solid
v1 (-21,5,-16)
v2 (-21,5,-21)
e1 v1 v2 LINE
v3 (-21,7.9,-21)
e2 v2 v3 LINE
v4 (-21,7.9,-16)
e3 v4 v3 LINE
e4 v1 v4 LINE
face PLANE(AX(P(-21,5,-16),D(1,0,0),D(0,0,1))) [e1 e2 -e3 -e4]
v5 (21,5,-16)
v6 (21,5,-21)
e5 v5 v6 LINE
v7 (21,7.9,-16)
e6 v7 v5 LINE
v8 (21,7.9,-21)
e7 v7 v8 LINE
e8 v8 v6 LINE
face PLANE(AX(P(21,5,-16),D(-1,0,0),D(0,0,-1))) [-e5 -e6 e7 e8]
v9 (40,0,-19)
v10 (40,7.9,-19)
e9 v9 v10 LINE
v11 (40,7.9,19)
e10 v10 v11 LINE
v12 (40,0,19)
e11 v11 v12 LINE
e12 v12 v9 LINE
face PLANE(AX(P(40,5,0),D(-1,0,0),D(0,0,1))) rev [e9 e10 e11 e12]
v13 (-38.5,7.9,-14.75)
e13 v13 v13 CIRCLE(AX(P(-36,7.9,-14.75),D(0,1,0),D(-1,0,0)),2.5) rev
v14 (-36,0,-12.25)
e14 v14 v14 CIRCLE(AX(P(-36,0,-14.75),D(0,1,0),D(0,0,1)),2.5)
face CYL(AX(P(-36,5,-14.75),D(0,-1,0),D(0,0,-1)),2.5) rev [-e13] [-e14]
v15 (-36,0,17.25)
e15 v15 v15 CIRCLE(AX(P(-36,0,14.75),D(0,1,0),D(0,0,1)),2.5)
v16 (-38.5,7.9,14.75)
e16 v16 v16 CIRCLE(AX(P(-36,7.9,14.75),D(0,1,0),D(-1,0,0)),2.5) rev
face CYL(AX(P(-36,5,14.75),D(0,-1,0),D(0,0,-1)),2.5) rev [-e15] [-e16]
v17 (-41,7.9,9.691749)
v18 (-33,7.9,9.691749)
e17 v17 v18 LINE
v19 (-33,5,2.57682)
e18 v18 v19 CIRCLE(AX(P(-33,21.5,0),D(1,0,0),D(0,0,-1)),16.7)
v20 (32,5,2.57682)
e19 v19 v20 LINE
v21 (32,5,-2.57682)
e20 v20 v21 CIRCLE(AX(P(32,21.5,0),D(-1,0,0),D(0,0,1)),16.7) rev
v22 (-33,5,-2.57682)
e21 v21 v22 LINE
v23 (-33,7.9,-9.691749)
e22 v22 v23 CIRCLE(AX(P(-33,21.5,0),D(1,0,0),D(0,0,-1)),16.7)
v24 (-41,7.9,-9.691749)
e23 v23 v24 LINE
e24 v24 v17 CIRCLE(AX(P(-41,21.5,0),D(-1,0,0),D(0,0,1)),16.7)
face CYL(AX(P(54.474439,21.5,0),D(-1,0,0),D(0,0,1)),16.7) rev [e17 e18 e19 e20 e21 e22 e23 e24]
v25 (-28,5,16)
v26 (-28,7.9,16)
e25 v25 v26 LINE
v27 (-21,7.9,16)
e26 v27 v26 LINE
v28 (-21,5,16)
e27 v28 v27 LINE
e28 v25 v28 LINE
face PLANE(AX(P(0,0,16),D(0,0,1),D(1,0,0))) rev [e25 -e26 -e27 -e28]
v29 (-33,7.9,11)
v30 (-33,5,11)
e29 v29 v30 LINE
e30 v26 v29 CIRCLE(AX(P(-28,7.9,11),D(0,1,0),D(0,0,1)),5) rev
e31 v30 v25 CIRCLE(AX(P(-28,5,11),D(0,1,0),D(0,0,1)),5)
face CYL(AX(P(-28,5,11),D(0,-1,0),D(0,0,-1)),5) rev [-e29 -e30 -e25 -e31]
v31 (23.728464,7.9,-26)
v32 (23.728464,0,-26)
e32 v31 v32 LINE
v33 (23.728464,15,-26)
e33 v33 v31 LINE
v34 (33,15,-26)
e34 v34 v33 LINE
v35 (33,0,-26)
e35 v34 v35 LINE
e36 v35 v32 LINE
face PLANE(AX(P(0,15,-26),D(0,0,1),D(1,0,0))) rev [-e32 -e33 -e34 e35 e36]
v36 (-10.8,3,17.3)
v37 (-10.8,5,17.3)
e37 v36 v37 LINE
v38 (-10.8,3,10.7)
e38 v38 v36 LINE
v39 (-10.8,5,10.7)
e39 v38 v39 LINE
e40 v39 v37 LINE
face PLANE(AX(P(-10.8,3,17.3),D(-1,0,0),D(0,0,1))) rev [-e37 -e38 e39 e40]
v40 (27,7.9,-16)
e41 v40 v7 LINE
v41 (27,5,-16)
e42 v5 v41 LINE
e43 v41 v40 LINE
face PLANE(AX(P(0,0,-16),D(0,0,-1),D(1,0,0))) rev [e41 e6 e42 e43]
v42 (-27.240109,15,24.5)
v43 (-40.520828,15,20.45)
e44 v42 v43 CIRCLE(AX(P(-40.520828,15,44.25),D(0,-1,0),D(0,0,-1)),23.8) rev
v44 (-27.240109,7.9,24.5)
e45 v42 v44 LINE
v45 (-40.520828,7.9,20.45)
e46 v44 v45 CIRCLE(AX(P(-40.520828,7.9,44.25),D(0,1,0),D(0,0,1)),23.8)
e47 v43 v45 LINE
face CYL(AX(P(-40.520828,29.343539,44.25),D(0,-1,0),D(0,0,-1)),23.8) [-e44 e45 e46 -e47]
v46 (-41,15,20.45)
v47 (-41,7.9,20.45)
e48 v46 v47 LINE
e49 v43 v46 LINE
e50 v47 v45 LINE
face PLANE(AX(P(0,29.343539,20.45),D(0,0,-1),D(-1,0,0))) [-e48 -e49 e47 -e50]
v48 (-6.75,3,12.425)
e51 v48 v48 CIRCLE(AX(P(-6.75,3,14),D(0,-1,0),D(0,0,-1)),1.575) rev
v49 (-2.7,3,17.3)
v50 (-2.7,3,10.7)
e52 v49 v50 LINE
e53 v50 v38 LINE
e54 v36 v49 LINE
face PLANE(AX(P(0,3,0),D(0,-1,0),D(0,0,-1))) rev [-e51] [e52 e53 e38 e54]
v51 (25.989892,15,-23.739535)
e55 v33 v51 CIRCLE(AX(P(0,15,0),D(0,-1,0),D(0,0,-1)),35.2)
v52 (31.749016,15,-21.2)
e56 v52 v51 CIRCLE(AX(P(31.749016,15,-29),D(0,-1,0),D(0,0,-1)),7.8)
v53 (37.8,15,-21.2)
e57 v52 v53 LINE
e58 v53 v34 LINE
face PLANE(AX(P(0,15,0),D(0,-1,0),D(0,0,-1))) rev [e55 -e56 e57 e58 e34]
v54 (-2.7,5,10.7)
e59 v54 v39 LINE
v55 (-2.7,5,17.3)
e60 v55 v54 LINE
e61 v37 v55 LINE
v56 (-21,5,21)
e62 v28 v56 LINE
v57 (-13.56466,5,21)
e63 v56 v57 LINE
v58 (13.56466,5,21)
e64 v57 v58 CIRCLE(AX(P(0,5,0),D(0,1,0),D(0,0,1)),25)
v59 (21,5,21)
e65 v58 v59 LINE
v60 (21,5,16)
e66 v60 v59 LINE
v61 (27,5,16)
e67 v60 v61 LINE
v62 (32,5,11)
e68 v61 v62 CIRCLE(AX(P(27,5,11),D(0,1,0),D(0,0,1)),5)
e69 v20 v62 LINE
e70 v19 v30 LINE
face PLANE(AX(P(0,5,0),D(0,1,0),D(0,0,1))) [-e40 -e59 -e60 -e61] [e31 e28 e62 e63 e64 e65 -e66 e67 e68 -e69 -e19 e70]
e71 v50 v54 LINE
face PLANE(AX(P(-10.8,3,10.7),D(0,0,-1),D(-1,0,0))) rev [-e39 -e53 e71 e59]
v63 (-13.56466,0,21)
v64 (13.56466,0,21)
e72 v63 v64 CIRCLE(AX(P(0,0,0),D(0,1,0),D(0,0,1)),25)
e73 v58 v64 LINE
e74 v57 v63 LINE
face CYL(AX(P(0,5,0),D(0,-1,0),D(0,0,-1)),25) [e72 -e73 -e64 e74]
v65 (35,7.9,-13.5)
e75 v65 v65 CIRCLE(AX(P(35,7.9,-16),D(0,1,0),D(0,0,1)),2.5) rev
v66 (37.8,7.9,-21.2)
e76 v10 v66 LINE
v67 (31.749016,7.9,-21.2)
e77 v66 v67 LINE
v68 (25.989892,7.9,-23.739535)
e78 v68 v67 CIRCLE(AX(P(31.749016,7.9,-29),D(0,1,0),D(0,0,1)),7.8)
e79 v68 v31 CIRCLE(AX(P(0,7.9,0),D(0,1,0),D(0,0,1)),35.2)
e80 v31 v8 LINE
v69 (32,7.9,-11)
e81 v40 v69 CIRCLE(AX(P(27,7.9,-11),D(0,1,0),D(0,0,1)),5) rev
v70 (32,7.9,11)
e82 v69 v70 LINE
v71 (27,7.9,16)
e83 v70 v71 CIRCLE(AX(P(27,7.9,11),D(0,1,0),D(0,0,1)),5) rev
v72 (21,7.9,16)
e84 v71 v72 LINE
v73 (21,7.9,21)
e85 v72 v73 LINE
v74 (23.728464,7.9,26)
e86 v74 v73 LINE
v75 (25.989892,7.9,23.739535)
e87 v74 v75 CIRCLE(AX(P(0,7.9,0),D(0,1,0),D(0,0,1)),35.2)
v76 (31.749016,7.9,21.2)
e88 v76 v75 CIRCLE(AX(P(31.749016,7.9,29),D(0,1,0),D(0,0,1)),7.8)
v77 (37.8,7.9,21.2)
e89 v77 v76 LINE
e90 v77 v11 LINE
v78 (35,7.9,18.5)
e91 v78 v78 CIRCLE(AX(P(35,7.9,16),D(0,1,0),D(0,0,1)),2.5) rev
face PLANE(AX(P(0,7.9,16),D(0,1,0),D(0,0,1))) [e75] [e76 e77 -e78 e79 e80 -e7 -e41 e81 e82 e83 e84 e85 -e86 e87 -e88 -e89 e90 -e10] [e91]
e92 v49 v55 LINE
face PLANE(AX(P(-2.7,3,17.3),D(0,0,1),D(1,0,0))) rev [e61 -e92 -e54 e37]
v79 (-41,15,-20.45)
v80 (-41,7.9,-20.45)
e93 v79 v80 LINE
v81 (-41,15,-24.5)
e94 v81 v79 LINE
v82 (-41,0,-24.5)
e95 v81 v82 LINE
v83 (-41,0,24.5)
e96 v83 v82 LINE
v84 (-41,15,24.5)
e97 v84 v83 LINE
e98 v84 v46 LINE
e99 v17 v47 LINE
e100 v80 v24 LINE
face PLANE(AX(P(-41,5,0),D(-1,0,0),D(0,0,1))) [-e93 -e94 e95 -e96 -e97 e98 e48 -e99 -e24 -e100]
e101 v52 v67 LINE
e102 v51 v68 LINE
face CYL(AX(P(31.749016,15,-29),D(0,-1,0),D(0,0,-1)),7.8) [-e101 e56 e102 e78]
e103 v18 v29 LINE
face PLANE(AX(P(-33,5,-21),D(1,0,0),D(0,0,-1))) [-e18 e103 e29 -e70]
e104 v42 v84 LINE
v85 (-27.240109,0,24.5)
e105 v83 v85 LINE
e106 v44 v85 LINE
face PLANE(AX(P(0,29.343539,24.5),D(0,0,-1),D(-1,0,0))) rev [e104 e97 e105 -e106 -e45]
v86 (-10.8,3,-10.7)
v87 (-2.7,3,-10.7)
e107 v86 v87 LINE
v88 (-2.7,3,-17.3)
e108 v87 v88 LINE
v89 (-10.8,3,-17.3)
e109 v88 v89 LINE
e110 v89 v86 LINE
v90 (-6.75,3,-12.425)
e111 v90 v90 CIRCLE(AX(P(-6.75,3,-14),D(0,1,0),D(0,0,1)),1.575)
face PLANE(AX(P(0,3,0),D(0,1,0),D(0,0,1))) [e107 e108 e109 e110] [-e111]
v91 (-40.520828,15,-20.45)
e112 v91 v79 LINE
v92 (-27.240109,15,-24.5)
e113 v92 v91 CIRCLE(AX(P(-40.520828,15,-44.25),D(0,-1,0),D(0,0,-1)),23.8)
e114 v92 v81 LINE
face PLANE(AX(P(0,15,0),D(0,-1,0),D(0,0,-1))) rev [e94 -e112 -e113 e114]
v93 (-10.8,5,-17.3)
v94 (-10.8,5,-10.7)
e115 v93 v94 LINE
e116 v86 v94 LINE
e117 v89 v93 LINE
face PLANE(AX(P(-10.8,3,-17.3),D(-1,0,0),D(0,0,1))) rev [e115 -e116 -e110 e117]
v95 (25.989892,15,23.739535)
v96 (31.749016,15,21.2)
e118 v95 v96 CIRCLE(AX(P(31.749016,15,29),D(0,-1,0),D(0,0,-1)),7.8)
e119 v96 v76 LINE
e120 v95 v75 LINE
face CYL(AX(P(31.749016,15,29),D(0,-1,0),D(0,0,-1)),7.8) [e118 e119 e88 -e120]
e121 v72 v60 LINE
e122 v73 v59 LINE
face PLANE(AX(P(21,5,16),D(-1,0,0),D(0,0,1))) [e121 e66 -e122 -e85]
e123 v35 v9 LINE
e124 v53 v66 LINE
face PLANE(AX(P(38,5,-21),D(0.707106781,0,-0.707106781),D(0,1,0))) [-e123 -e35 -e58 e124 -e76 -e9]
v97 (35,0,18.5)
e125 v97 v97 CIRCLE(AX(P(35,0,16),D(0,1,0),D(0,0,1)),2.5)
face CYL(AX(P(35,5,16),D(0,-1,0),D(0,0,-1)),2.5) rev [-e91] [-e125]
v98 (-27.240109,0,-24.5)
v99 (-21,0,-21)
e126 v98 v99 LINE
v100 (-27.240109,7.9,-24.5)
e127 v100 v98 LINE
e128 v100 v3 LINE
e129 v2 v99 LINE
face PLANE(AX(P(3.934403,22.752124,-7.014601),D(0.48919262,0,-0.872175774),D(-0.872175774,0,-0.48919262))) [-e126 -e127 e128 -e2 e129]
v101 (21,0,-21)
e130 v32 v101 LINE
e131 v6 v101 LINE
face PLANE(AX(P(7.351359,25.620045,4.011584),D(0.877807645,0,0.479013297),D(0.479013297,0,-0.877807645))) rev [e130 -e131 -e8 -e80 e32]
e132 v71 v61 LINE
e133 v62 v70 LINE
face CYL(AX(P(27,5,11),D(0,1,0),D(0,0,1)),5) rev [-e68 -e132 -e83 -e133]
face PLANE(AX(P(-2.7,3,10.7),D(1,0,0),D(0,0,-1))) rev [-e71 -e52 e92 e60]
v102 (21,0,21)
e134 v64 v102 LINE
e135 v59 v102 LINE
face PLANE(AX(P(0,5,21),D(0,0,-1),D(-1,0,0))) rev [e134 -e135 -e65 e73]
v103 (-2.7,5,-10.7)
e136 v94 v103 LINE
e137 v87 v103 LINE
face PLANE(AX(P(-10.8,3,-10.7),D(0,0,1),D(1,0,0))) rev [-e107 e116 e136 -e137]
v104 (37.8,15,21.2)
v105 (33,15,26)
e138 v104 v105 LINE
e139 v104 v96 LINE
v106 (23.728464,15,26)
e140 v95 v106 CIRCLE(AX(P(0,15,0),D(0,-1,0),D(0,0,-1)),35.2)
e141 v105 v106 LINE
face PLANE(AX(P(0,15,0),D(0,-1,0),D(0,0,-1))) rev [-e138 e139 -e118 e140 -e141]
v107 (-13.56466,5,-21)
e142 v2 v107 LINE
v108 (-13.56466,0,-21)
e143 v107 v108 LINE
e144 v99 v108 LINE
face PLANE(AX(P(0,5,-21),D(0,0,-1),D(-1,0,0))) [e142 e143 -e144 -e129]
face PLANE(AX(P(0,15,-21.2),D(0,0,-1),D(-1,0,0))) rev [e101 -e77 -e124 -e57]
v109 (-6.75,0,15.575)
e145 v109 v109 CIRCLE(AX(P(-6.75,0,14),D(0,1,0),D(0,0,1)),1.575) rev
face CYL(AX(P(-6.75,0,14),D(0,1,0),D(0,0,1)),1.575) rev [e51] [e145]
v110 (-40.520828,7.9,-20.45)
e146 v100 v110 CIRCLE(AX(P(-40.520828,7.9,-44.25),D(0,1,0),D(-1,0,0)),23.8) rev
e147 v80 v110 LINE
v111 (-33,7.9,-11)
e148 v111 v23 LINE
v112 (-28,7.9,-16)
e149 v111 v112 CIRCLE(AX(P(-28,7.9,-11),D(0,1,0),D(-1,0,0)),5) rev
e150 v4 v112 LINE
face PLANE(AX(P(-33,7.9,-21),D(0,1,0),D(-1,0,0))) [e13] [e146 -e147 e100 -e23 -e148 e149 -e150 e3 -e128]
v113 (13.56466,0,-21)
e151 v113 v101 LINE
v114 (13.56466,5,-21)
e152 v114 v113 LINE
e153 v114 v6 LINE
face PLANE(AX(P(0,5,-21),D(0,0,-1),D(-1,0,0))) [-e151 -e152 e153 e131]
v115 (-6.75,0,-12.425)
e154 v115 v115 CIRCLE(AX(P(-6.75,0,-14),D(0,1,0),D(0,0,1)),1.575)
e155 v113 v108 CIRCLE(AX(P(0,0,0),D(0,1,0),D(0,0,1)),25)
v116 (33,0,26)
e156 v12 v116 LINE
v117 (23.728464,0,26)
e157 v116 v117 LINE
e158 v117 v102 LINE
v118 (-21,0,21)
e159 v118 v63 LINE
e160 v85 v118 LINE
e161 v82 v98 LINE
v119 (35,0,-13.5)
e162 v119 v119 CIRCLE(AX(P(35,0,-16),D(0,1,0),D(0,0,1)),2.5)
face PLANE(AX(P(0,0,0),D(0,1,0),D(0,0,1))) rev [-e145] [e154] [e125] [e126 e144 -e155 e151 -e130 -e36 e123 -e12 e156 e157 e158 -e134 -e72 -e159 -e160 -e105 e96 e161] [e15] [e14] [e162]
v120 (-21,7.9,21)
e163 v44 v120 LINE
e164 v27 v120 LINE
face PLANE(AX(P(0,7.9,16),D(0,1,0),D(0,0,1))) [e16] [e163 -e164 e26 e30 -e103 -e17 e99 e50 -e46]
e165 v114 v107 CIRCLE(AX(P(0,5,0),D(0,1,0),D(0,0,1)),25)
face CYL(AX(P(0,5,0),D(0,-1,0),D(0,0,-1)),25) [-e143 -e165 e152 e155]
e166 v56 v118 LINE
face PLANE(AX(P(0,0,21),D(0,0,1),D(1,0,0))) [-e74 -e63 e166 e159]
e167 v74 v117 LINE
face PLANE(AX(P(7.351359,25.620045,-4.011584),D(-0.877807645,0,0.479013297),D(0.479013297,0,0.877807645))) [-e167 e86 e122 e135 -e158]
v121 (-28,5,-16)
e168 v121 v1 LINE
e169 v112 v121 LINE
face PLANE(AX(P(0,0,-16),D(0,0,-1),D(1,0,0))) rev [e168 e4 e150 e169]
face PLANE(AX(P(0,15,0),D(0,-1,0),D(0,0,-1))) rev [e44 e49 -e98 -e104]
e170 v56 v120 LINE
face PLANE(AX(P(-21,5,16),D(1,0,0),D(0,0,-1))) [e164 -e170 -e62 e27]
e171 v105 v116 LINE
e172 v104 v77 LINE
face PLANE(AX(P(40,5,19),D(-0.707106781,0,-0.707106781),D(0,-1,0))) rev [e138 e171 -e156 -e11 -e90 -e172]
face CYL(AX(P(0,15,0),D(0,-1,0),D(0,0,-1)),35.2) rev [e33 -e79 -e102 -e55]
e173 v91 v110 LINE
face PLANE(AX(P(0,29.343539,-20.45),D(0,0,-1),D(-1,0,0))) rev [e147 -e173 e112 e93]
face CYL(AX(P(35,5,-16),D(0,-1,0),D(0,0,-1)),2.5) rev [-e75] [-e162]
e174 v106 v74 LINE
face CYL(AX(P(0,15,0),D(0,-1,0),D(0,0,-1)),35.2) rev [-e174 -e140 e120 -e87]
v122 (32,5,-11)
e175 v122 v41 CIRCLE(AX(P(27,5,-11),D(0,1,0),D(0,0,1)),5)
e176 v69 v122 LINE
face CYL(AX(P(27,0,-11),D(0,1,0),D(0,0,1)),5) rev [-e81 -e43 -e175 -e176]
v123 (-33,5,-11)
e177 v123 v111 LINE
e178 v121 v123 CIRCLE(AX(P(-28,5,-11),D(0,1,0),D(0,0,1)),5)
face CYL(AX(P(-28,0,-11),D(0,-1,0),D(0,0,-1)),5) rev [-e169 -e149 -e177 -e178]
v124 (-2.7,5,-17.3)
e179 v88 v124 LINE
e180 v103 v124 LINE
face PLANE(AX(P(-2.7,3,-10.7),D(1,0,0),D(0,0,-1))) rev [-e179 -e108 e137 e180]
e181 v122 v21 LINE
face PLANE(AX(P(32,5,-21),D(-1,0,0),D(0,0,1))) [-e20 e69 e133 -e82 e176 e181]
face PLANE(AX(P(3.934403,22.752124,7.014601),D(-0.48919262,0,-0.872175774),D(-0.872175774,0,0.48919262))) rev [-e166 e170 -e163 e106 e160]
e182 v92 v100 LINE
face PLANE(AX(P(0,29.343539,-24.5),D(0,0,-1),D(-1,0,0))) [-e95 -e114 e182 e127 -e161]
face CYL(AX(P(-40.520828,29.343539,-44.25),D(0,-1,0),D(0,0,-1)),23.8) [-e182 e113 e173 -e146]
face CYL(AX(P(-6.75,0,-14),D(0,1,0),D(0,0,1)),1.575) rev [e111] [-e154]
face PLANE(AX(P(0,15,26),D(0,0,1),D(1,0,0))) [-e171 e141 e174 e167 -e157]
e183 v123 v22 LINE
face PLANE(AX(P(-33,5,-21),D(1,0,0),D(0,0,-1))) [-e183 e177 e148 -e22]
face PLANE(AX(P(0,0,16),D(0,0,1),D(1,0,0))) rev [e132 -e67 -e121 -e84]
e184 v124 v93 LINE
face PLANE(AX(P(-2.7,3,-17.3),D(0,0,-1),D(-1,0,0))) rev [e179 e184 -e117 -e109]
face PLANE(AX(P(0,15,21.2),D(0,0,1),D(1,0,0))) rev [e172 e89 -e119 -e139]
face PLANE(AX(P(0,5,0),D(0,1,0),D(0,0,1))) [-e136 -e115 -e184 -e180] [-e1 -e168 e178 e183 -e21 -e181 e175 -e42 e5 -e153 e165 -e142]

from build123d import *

# Parameters (mm, degrees)
SKETCH_1_R          = 25
SKETCH_1_W          = 81
SKETCH_1_H          = 42
SKETCH_1_R_2        = 2.5
EXTRUDE_1_DEPTH     = 5
SKETCH_3_W          = 8.1
SKETCH_3_H          = 6.6
SKETCH_3_R          = 1.575
CUT_EXTRUDE_1_DEPTH = 2
SKETCH_3_2_R        = 1.575
CUT_EXTRUDE_2_DEPTH = 49.280430818
SKETCH_4_W          = 8
SKETCH_4_H          = 2.9
EXTRUDE_2_DEPTH     = 42
SKETCH_1_3_R        = 2.5
CUT_EXTRUDE_3_DEPTH = 42
EXTRUDE_START       = 21
SKETCH_5_W          = 11
SKETCH_5_H          = 2.9
EXTRUDE_3_DEPTH     = 5
SKETCH_5_W_2        = 12
EXTRUDE_3_2_DEPTH   = 5
CUT_EXTRUDE_4_REACH = 87.138
CHAMFER_1_SIZE      = 2
EXTRUDE_4_DEPTH     = 15
EXTRUDE_4_2_DEPTH   = 15
EXTRUDE_START_2     = -15
EXTRUDE_5_DEPTH     = 7.9
EXTRUDE_6_DEPTH     = 15
EXTRUDE_7_DEPTH     = 7.9
FILLET_1_R          = 5


# Read off the part's stored shape, not the designer's step: 凸台-拉伸7
with BuildPart() as part:
    # 草图1 → 凸台-拉伸1 (new body)
    # profile 1 of 2: a face of its own
    with BuildSketch(Plane(origin=(0, 0, 0), x_dir=(1, 0, 0), z_dir=(0, 1, 0))):
        Circle(SKETCH_1_R)
    # profile 2 of 2: a face of its own
    with BuildSketch(Plane(origin=(0, 0, 0), x_dir=(1, 0, 0), z_dir=(0, 1, 0))):
        with Locations((-0.5, 0)):
            Rectangle(SKETCH_1_W, SKETCH_1_H)
        with Locations(Location((35, 16, 0), (0, 0, 270))):
            Circle(SKETCH_1_R_2, mode=Mode.SUBTRACT)
        with Locations(Location((35, -16, 0), (0, 0, 270))):
            Circle(SKETCH_1_R_2, mode=Mode.SUBTRACT)
        with Locations(Location((-36, 14.75, 0), (0, 0, 270))):
            Circle(SKETCH_1_R_2, mode=Mode.SUBTRACT)
        with Locations(Location((-36, -14.75, 0), (0, 0, 270))):
            Circle(SKETCH_1_R_2, mode=Mode.SUBTRACT)
    extrude(amount=EXTRUDE_1_DEPTH)

    # 草图3 → 切除-拉伸1 (cut)
    # profile 1 of 2: a face of its own
    with BuildSketch(Plane(origin=(0, 5, 0), x_dir=(1, 0, 0), z_dir=(0, 1, 0))):
        with Locations((-6.75, -14)):
            Rectangle(SKETCH_3_W, SKETCH_3_H)
        with Locations(Location((-6.75, -14, 0), (0, 0, 90))):
            Circle(SKETCH_3_R, mode=Mode.SUBTRACT)
    # profile 2 of 2: a face of its own
    with BuildSketch(Plane(origin=(0, 5, 0), x_dir=(1, 0, 0), z_dir=(0, 1, 0))):
        with Locations((-6.75, 14)):
            Rectangle(SKETCH_3_W, SKETCH_3_H)
        with Locations(Location((-6.75, 14, 0), (0, 0, 270))):
            Circle(SKETCH_3_R, mode=Mode.SUBTRACT)
    extrude(amount=-CUT_EXTRUDE_1_DEPTH, mode=Mode.SUBTRACT)

    # 草图3<2> → 切除-拉伸2 (cut, through all)
    with BuildSketch(Plane(origin=(0, 5, 0), x_dir=(1, 0, 0), z_dir=(0, 1, 0))):
        with Locations(Location((-6.75, 14, 0), (0, 0, 270))):
            Circle(SKETCH_3_2_R)
        with Locations(Location((-6.75, -14, 0), (0, 0, 270))):
            Circle(SKETCH_3_2_R)
    extrude(amount=-CUT_EXTRUDE_2_DEPTH, mode=Mode.SUBTRACT)

    # 草图4 → 凸台-拉伸2 (add)
    with BuildSketch(Plane.XY.offset(21)):
        with Locations((36, 6.45)):
            Rectangle(SKETCH_4_W, SKETCH_4_H)
        with Locations((-37, 6.45)):
            Rectangle(SKETCH_4_W, SKETCH_4_H)
    extrude(amount=-EXTRUDE_2_DEPTH)

    # 草图1<3> → 切除-拉伸3 (cut)
    with BuildSketch(Plane(origin=(0, 0, 0), x_dir=(1, 0, 0), z_dir=(0, 1, 0))):
        with Locations(Location((35, 16, 0), (0, 0, 270))):
            Circle(SKETCH_1_3_R)
        with Locations(Location((35, -16, 0), (0, 0, 270))):
            Circle(SKETCH_1_3_R)
        with Locations(Location((-36, 14.75, 0), (0, 0, 180))):
            Circle(SKETCH_1_3_R)
        with Locations(Location((-36, -14.75, 0), (0, 0, 180))):
            Circle(SKETCH_1_3_R)
    extrude(amount=CUT_EXTRUDE_3_DEPTH, mode=Mode.SUBTRACT)


with BuildPart() as body_2:
    # 草图5 → 凸台-拉伸3 (new body)
    with BuildSketch(Plane.XY.offset(EXTRUDE_START)):
        with Locations((26.5, 6.45)):
            Rectangle(SKETCH_5_W, SKETCH_5_H)
    extrude_3 = extrude(amount=-EXTRUDE_3_DEPTH)


with BuildPart() as body_3:
    # 草图5 → Extrude 3 2 (new body)
    with BuildSketch(Plane.XY.offset(EXTRUDE_START)):
        with Locations((-27, 6.45)):
            Rectangle(SKETCH_5_W_2, SKETCH_5_H)
    extrude_3_2 = extrude(amount=-EXTRUDE_3_2_DEPTH)



with BuildPart() as part_1:
    add(part.part)

    # 镜向2: 凸台-拉伸3, Extrude 3 2 across plane
    add(extrude_3.mirror(Plane(origin=(0, 0, 0), x_dir=(1, 0, 0), z_dir=(0, 0, -1))))
    add(extrude_3_2.mirror(Plane(origin=(0, 0, 0), x_dir=(1, 0, 0), z_dir=(0, 0, -1))))

    # 切除-拉伸4: up to this face of the body (flat: up to its plane)
    cut_extrude_4_end = Plane(part_1.part.faces().sort_by_distance((32, 6.45, 2.5))[0])
    # 草图6 → 切除-拉伸4 (cut, up to the picked face)
    with BuildSketch(Plane.ZY.offset(41), mode=Mode.PRIVATE) as cut_extrude_4_sk1:
        with BuildLine():
            Line((11.041960784, 8.971428571), (-11.041960784, 8.971428571))
            ThreePointArc((-11.041960784, 8.971428571), (-8.690257734, 7.239234925), (-6.072727273, 5.943265655))
            ThreePointArc((-6.072727273, 5.943265655), (0, 4.8), (6.072727273, 5.943265655))
            ThreePointArc((6.072727273, 5.943265655), (8.690257734, 7.239234925), (11.041960784, 8.971428571))
        make_face()
    cut_extrude_4_tool1 = split(extrude(cut_extrude_4_sk1.sketch, amount=-CUT_EXTRUDE_4_REACH, mode=Mode.PRIVATE), bisect_by=cut_extrude_4_end, keep=Keep.BOTH, mode=Mode.PRIVATE)
    add(cut_extrude_4_tool1.solids().sort_by(Axis((-41, 7.283597, 0), (1, 0, 0)))[0], mode=Mode.SUBTRACT)

    # 倒角1
    chamfer_1_edges = [part_1.edges().sort_by_distance(p)[0] for p in [
        (-41, 3.95, 21),
        (-41, 3.95, -21),
        (40, 3.95, -21),
        (40, 3.95, 21),
    ]]
    chamfer(chamfer_1_edges, length=CHAMFER_1_SIZE)



with BuildPart() as body_4:
    # 草图9 → 凸台-拉伸4 (new body)
    with BuildSketch(Plane.XZ):
        with BuildLine():
            Line((33, 26), (23.72846392, 26))
            ThreePointArc((23.72846392, 26), (24.88485791, 24.895458357), (25.989891949, 23.739534884))
            ThreePointArc((25.989891949, 23.739534884), (27.687521221, 22.340851231), (29.708138181, 21.471732017))
            ThreePointArc((29.708138181, 21.471732017), (30.719571772, 21.268231436), (31.749015733, 21.2))
            Line((31.749015733, 21.2), (37.8, 21.2))
            Line((37.8, 21.2), (33, 26))
        make_face()
    extrude(amount=-EXTRUDE_4_DEPTH)


with BuildPart() as body_5:
    # 草图9 → Extrude 4 2 (new body)
    with BuildSketch(Plane.XZ):
        with BuildLine():
            Line((33, -26), (37.8, -21.2))
            Line((37.8, -21.2), (31.749015733, -21.2))
            ThreePointArc((31.749015733, -21.2), (30.719571772, -21.268231436), (29.708138181, -21.471732017))
            ThreePointArc((29.708138181, -21.471732017), (27.687521221, -22.340851231), (25.989891949, -23.739534884))
            ThreePointArc((25.989891949, -23.739534884), (24.88485791, -24.895458357), (23.72846392, -26))
            Line((23.72846392, -26), (33, -26))
        make_face()
    extrude(amount=-EXTRUDE_4_2_DEPTH)


with BuildPart() as part_2:
    add(part_1.part)

    add(body_4.part)  # 凸台-拉伸5 merges body 4
    # 草图10 → 凸台-拉伸5 (add)
    with BuildSketch(Plane(origin=(0, 15, 0), x_dir=(1, 0, 0), z_dir=(0, 1, 0)).offset(EXTRUDE_START_2)):
        with BuildLine():
            Line((21, -21), (23.72846392, -26))
            ThreePointArc((23.72846392, -26), (24.88485791, -24.895458357), (25.989891949, -23.739534884))
            ThreePointArc((25.989891949, -23.739534884), (28.601924052, -21.863066908), (31.749015733, -21.2))
            Line((31.749015733, -21.2), (37.8, -21.2))
            Line((37.8, -21.2), (38, -21))
            Line((38, -21), (32, -21))
            Line((32, -21), (21, -21))
        make_face()
    extrude_5 = extrude(amount=EXTRUDE_5_DEPTH)


with BuildPart() as body_3_1:
    add(body_3.part)

    add(part_2.part)  # 凸台-拉伸6 merges part
    # 草图11 → 凸台-拉伸6 (add)
    with BuildSketch(Plane.XZ.offset(EXTRUDE_START_2)):
        with BuildLine():
            Line((-41, 23), (-41, 20.45))
            Line((-41, 20.45), (-40.520827978, 20.45))
            ThreePointArc((-40.520827978, 20.45), (-40.024975712, 20.455165886), (-39.5293387, 20.4706613))
            Line((-39.5293387, 20.4706613), (-39, 21))
            Line((-39, 21), (-35.43383476, 21))
            ThreePointArc((-35.43383476, 21), (-31.171725667, 22.363148102), (-27.240108871, 24.5))
            Line((-27.240108871, 24.5), (-41, 24.5))
            Line((-41, 24.5), (-41, 23))
        make_face()
        with BuildLine():
            Line((-39, 21), (-39.5293387, 20.4706613))
            ThreePointArc((-39.5293387, 20.4706613), (-39.301113021, 20.481274846), (-39.072999743, 20.494078772))
            ThreePointArc((-39.072999743, 20.494078772), (-38.358018151, 20.54847571), (-37.644999743, 20.624386527))
            ThreePointArc((-37.644999743, 20.624386527), (-36.534990206, 20.786132091), (-35.43383476, 21))
            Line((-35.43383476, 21), (-39, 21))
        make_face()
    extrude_6 = extrude(amount=EXTRUDE_6_DEPTH)

    # 凸台-拉伸7 outline → 凸台-拉伸7 (add)
    with BuildSketch(Plane(origin=(0, 0, 0), x_dir=(1, 0, 0), z_dir=(0, 1, 0))):
        with BuildLine():
            Line((-39.5293387, -20.4706613), (-41, -19))
            Line((-41, -19), (-41, -20.45))
            Line((-41, -20.45), (-40.520827978, -20.45))
            ThreePointArc((-40.520827978, -20.45), (-40.024975712, -20.455165886), (-39.5293387, -20.4706613))
        make_face()
        with BuildLine():
            Line((-21, -21), (-35.43383476, -21))
            ThreePointArc((-35.43383476, -21), (-31.171725667, -22.363148102), (-27.240108871, -24.5))
            Line((-27.240108871, -24.5), (-21, -21))
        make_face()
    extrude_7 = extrude(amount=EXTRUDE_7_DEPTH)

    # 镜向3: 凸台-拉伸5, 凸台-拉伸6, 凸台-拉伸7 across plane
    add(extrude_5.mirror(Plane(origin=(0, 0, 0), x_dir=(1, 0, 0), z_dir=(0, 0, -1))))
    add(extrude_6.mirror(Plane(origin=(0, 0, 0), x_dir=(1, 0, 0), z_dir=(0, 0, -1))))
    add(extrude_7.mirror(Plane(origin=(0, 0, 0), x_dir=(1, 0, 0), z_dir=(0, 0, -1))))


with BuildPart() as body_2_1:
    add(body_2.part)

    # Combine 1: union body 3, body 5
    add(body_3_1.part)
    add(body_5.part)

    # 圆角1
    fillet_1_edges = [body_2_1.edges().sort_by_distance(p)[0] for p in [
        (32, 6.45, 16),
        (-33, 6.45, 16),
        (-33, 6.45, -16),
        (32, 6.45, -16),
    ]]
    fillet(fillet_1_edges, radius=FILLET_1_R)


solid = body_2_1.part
